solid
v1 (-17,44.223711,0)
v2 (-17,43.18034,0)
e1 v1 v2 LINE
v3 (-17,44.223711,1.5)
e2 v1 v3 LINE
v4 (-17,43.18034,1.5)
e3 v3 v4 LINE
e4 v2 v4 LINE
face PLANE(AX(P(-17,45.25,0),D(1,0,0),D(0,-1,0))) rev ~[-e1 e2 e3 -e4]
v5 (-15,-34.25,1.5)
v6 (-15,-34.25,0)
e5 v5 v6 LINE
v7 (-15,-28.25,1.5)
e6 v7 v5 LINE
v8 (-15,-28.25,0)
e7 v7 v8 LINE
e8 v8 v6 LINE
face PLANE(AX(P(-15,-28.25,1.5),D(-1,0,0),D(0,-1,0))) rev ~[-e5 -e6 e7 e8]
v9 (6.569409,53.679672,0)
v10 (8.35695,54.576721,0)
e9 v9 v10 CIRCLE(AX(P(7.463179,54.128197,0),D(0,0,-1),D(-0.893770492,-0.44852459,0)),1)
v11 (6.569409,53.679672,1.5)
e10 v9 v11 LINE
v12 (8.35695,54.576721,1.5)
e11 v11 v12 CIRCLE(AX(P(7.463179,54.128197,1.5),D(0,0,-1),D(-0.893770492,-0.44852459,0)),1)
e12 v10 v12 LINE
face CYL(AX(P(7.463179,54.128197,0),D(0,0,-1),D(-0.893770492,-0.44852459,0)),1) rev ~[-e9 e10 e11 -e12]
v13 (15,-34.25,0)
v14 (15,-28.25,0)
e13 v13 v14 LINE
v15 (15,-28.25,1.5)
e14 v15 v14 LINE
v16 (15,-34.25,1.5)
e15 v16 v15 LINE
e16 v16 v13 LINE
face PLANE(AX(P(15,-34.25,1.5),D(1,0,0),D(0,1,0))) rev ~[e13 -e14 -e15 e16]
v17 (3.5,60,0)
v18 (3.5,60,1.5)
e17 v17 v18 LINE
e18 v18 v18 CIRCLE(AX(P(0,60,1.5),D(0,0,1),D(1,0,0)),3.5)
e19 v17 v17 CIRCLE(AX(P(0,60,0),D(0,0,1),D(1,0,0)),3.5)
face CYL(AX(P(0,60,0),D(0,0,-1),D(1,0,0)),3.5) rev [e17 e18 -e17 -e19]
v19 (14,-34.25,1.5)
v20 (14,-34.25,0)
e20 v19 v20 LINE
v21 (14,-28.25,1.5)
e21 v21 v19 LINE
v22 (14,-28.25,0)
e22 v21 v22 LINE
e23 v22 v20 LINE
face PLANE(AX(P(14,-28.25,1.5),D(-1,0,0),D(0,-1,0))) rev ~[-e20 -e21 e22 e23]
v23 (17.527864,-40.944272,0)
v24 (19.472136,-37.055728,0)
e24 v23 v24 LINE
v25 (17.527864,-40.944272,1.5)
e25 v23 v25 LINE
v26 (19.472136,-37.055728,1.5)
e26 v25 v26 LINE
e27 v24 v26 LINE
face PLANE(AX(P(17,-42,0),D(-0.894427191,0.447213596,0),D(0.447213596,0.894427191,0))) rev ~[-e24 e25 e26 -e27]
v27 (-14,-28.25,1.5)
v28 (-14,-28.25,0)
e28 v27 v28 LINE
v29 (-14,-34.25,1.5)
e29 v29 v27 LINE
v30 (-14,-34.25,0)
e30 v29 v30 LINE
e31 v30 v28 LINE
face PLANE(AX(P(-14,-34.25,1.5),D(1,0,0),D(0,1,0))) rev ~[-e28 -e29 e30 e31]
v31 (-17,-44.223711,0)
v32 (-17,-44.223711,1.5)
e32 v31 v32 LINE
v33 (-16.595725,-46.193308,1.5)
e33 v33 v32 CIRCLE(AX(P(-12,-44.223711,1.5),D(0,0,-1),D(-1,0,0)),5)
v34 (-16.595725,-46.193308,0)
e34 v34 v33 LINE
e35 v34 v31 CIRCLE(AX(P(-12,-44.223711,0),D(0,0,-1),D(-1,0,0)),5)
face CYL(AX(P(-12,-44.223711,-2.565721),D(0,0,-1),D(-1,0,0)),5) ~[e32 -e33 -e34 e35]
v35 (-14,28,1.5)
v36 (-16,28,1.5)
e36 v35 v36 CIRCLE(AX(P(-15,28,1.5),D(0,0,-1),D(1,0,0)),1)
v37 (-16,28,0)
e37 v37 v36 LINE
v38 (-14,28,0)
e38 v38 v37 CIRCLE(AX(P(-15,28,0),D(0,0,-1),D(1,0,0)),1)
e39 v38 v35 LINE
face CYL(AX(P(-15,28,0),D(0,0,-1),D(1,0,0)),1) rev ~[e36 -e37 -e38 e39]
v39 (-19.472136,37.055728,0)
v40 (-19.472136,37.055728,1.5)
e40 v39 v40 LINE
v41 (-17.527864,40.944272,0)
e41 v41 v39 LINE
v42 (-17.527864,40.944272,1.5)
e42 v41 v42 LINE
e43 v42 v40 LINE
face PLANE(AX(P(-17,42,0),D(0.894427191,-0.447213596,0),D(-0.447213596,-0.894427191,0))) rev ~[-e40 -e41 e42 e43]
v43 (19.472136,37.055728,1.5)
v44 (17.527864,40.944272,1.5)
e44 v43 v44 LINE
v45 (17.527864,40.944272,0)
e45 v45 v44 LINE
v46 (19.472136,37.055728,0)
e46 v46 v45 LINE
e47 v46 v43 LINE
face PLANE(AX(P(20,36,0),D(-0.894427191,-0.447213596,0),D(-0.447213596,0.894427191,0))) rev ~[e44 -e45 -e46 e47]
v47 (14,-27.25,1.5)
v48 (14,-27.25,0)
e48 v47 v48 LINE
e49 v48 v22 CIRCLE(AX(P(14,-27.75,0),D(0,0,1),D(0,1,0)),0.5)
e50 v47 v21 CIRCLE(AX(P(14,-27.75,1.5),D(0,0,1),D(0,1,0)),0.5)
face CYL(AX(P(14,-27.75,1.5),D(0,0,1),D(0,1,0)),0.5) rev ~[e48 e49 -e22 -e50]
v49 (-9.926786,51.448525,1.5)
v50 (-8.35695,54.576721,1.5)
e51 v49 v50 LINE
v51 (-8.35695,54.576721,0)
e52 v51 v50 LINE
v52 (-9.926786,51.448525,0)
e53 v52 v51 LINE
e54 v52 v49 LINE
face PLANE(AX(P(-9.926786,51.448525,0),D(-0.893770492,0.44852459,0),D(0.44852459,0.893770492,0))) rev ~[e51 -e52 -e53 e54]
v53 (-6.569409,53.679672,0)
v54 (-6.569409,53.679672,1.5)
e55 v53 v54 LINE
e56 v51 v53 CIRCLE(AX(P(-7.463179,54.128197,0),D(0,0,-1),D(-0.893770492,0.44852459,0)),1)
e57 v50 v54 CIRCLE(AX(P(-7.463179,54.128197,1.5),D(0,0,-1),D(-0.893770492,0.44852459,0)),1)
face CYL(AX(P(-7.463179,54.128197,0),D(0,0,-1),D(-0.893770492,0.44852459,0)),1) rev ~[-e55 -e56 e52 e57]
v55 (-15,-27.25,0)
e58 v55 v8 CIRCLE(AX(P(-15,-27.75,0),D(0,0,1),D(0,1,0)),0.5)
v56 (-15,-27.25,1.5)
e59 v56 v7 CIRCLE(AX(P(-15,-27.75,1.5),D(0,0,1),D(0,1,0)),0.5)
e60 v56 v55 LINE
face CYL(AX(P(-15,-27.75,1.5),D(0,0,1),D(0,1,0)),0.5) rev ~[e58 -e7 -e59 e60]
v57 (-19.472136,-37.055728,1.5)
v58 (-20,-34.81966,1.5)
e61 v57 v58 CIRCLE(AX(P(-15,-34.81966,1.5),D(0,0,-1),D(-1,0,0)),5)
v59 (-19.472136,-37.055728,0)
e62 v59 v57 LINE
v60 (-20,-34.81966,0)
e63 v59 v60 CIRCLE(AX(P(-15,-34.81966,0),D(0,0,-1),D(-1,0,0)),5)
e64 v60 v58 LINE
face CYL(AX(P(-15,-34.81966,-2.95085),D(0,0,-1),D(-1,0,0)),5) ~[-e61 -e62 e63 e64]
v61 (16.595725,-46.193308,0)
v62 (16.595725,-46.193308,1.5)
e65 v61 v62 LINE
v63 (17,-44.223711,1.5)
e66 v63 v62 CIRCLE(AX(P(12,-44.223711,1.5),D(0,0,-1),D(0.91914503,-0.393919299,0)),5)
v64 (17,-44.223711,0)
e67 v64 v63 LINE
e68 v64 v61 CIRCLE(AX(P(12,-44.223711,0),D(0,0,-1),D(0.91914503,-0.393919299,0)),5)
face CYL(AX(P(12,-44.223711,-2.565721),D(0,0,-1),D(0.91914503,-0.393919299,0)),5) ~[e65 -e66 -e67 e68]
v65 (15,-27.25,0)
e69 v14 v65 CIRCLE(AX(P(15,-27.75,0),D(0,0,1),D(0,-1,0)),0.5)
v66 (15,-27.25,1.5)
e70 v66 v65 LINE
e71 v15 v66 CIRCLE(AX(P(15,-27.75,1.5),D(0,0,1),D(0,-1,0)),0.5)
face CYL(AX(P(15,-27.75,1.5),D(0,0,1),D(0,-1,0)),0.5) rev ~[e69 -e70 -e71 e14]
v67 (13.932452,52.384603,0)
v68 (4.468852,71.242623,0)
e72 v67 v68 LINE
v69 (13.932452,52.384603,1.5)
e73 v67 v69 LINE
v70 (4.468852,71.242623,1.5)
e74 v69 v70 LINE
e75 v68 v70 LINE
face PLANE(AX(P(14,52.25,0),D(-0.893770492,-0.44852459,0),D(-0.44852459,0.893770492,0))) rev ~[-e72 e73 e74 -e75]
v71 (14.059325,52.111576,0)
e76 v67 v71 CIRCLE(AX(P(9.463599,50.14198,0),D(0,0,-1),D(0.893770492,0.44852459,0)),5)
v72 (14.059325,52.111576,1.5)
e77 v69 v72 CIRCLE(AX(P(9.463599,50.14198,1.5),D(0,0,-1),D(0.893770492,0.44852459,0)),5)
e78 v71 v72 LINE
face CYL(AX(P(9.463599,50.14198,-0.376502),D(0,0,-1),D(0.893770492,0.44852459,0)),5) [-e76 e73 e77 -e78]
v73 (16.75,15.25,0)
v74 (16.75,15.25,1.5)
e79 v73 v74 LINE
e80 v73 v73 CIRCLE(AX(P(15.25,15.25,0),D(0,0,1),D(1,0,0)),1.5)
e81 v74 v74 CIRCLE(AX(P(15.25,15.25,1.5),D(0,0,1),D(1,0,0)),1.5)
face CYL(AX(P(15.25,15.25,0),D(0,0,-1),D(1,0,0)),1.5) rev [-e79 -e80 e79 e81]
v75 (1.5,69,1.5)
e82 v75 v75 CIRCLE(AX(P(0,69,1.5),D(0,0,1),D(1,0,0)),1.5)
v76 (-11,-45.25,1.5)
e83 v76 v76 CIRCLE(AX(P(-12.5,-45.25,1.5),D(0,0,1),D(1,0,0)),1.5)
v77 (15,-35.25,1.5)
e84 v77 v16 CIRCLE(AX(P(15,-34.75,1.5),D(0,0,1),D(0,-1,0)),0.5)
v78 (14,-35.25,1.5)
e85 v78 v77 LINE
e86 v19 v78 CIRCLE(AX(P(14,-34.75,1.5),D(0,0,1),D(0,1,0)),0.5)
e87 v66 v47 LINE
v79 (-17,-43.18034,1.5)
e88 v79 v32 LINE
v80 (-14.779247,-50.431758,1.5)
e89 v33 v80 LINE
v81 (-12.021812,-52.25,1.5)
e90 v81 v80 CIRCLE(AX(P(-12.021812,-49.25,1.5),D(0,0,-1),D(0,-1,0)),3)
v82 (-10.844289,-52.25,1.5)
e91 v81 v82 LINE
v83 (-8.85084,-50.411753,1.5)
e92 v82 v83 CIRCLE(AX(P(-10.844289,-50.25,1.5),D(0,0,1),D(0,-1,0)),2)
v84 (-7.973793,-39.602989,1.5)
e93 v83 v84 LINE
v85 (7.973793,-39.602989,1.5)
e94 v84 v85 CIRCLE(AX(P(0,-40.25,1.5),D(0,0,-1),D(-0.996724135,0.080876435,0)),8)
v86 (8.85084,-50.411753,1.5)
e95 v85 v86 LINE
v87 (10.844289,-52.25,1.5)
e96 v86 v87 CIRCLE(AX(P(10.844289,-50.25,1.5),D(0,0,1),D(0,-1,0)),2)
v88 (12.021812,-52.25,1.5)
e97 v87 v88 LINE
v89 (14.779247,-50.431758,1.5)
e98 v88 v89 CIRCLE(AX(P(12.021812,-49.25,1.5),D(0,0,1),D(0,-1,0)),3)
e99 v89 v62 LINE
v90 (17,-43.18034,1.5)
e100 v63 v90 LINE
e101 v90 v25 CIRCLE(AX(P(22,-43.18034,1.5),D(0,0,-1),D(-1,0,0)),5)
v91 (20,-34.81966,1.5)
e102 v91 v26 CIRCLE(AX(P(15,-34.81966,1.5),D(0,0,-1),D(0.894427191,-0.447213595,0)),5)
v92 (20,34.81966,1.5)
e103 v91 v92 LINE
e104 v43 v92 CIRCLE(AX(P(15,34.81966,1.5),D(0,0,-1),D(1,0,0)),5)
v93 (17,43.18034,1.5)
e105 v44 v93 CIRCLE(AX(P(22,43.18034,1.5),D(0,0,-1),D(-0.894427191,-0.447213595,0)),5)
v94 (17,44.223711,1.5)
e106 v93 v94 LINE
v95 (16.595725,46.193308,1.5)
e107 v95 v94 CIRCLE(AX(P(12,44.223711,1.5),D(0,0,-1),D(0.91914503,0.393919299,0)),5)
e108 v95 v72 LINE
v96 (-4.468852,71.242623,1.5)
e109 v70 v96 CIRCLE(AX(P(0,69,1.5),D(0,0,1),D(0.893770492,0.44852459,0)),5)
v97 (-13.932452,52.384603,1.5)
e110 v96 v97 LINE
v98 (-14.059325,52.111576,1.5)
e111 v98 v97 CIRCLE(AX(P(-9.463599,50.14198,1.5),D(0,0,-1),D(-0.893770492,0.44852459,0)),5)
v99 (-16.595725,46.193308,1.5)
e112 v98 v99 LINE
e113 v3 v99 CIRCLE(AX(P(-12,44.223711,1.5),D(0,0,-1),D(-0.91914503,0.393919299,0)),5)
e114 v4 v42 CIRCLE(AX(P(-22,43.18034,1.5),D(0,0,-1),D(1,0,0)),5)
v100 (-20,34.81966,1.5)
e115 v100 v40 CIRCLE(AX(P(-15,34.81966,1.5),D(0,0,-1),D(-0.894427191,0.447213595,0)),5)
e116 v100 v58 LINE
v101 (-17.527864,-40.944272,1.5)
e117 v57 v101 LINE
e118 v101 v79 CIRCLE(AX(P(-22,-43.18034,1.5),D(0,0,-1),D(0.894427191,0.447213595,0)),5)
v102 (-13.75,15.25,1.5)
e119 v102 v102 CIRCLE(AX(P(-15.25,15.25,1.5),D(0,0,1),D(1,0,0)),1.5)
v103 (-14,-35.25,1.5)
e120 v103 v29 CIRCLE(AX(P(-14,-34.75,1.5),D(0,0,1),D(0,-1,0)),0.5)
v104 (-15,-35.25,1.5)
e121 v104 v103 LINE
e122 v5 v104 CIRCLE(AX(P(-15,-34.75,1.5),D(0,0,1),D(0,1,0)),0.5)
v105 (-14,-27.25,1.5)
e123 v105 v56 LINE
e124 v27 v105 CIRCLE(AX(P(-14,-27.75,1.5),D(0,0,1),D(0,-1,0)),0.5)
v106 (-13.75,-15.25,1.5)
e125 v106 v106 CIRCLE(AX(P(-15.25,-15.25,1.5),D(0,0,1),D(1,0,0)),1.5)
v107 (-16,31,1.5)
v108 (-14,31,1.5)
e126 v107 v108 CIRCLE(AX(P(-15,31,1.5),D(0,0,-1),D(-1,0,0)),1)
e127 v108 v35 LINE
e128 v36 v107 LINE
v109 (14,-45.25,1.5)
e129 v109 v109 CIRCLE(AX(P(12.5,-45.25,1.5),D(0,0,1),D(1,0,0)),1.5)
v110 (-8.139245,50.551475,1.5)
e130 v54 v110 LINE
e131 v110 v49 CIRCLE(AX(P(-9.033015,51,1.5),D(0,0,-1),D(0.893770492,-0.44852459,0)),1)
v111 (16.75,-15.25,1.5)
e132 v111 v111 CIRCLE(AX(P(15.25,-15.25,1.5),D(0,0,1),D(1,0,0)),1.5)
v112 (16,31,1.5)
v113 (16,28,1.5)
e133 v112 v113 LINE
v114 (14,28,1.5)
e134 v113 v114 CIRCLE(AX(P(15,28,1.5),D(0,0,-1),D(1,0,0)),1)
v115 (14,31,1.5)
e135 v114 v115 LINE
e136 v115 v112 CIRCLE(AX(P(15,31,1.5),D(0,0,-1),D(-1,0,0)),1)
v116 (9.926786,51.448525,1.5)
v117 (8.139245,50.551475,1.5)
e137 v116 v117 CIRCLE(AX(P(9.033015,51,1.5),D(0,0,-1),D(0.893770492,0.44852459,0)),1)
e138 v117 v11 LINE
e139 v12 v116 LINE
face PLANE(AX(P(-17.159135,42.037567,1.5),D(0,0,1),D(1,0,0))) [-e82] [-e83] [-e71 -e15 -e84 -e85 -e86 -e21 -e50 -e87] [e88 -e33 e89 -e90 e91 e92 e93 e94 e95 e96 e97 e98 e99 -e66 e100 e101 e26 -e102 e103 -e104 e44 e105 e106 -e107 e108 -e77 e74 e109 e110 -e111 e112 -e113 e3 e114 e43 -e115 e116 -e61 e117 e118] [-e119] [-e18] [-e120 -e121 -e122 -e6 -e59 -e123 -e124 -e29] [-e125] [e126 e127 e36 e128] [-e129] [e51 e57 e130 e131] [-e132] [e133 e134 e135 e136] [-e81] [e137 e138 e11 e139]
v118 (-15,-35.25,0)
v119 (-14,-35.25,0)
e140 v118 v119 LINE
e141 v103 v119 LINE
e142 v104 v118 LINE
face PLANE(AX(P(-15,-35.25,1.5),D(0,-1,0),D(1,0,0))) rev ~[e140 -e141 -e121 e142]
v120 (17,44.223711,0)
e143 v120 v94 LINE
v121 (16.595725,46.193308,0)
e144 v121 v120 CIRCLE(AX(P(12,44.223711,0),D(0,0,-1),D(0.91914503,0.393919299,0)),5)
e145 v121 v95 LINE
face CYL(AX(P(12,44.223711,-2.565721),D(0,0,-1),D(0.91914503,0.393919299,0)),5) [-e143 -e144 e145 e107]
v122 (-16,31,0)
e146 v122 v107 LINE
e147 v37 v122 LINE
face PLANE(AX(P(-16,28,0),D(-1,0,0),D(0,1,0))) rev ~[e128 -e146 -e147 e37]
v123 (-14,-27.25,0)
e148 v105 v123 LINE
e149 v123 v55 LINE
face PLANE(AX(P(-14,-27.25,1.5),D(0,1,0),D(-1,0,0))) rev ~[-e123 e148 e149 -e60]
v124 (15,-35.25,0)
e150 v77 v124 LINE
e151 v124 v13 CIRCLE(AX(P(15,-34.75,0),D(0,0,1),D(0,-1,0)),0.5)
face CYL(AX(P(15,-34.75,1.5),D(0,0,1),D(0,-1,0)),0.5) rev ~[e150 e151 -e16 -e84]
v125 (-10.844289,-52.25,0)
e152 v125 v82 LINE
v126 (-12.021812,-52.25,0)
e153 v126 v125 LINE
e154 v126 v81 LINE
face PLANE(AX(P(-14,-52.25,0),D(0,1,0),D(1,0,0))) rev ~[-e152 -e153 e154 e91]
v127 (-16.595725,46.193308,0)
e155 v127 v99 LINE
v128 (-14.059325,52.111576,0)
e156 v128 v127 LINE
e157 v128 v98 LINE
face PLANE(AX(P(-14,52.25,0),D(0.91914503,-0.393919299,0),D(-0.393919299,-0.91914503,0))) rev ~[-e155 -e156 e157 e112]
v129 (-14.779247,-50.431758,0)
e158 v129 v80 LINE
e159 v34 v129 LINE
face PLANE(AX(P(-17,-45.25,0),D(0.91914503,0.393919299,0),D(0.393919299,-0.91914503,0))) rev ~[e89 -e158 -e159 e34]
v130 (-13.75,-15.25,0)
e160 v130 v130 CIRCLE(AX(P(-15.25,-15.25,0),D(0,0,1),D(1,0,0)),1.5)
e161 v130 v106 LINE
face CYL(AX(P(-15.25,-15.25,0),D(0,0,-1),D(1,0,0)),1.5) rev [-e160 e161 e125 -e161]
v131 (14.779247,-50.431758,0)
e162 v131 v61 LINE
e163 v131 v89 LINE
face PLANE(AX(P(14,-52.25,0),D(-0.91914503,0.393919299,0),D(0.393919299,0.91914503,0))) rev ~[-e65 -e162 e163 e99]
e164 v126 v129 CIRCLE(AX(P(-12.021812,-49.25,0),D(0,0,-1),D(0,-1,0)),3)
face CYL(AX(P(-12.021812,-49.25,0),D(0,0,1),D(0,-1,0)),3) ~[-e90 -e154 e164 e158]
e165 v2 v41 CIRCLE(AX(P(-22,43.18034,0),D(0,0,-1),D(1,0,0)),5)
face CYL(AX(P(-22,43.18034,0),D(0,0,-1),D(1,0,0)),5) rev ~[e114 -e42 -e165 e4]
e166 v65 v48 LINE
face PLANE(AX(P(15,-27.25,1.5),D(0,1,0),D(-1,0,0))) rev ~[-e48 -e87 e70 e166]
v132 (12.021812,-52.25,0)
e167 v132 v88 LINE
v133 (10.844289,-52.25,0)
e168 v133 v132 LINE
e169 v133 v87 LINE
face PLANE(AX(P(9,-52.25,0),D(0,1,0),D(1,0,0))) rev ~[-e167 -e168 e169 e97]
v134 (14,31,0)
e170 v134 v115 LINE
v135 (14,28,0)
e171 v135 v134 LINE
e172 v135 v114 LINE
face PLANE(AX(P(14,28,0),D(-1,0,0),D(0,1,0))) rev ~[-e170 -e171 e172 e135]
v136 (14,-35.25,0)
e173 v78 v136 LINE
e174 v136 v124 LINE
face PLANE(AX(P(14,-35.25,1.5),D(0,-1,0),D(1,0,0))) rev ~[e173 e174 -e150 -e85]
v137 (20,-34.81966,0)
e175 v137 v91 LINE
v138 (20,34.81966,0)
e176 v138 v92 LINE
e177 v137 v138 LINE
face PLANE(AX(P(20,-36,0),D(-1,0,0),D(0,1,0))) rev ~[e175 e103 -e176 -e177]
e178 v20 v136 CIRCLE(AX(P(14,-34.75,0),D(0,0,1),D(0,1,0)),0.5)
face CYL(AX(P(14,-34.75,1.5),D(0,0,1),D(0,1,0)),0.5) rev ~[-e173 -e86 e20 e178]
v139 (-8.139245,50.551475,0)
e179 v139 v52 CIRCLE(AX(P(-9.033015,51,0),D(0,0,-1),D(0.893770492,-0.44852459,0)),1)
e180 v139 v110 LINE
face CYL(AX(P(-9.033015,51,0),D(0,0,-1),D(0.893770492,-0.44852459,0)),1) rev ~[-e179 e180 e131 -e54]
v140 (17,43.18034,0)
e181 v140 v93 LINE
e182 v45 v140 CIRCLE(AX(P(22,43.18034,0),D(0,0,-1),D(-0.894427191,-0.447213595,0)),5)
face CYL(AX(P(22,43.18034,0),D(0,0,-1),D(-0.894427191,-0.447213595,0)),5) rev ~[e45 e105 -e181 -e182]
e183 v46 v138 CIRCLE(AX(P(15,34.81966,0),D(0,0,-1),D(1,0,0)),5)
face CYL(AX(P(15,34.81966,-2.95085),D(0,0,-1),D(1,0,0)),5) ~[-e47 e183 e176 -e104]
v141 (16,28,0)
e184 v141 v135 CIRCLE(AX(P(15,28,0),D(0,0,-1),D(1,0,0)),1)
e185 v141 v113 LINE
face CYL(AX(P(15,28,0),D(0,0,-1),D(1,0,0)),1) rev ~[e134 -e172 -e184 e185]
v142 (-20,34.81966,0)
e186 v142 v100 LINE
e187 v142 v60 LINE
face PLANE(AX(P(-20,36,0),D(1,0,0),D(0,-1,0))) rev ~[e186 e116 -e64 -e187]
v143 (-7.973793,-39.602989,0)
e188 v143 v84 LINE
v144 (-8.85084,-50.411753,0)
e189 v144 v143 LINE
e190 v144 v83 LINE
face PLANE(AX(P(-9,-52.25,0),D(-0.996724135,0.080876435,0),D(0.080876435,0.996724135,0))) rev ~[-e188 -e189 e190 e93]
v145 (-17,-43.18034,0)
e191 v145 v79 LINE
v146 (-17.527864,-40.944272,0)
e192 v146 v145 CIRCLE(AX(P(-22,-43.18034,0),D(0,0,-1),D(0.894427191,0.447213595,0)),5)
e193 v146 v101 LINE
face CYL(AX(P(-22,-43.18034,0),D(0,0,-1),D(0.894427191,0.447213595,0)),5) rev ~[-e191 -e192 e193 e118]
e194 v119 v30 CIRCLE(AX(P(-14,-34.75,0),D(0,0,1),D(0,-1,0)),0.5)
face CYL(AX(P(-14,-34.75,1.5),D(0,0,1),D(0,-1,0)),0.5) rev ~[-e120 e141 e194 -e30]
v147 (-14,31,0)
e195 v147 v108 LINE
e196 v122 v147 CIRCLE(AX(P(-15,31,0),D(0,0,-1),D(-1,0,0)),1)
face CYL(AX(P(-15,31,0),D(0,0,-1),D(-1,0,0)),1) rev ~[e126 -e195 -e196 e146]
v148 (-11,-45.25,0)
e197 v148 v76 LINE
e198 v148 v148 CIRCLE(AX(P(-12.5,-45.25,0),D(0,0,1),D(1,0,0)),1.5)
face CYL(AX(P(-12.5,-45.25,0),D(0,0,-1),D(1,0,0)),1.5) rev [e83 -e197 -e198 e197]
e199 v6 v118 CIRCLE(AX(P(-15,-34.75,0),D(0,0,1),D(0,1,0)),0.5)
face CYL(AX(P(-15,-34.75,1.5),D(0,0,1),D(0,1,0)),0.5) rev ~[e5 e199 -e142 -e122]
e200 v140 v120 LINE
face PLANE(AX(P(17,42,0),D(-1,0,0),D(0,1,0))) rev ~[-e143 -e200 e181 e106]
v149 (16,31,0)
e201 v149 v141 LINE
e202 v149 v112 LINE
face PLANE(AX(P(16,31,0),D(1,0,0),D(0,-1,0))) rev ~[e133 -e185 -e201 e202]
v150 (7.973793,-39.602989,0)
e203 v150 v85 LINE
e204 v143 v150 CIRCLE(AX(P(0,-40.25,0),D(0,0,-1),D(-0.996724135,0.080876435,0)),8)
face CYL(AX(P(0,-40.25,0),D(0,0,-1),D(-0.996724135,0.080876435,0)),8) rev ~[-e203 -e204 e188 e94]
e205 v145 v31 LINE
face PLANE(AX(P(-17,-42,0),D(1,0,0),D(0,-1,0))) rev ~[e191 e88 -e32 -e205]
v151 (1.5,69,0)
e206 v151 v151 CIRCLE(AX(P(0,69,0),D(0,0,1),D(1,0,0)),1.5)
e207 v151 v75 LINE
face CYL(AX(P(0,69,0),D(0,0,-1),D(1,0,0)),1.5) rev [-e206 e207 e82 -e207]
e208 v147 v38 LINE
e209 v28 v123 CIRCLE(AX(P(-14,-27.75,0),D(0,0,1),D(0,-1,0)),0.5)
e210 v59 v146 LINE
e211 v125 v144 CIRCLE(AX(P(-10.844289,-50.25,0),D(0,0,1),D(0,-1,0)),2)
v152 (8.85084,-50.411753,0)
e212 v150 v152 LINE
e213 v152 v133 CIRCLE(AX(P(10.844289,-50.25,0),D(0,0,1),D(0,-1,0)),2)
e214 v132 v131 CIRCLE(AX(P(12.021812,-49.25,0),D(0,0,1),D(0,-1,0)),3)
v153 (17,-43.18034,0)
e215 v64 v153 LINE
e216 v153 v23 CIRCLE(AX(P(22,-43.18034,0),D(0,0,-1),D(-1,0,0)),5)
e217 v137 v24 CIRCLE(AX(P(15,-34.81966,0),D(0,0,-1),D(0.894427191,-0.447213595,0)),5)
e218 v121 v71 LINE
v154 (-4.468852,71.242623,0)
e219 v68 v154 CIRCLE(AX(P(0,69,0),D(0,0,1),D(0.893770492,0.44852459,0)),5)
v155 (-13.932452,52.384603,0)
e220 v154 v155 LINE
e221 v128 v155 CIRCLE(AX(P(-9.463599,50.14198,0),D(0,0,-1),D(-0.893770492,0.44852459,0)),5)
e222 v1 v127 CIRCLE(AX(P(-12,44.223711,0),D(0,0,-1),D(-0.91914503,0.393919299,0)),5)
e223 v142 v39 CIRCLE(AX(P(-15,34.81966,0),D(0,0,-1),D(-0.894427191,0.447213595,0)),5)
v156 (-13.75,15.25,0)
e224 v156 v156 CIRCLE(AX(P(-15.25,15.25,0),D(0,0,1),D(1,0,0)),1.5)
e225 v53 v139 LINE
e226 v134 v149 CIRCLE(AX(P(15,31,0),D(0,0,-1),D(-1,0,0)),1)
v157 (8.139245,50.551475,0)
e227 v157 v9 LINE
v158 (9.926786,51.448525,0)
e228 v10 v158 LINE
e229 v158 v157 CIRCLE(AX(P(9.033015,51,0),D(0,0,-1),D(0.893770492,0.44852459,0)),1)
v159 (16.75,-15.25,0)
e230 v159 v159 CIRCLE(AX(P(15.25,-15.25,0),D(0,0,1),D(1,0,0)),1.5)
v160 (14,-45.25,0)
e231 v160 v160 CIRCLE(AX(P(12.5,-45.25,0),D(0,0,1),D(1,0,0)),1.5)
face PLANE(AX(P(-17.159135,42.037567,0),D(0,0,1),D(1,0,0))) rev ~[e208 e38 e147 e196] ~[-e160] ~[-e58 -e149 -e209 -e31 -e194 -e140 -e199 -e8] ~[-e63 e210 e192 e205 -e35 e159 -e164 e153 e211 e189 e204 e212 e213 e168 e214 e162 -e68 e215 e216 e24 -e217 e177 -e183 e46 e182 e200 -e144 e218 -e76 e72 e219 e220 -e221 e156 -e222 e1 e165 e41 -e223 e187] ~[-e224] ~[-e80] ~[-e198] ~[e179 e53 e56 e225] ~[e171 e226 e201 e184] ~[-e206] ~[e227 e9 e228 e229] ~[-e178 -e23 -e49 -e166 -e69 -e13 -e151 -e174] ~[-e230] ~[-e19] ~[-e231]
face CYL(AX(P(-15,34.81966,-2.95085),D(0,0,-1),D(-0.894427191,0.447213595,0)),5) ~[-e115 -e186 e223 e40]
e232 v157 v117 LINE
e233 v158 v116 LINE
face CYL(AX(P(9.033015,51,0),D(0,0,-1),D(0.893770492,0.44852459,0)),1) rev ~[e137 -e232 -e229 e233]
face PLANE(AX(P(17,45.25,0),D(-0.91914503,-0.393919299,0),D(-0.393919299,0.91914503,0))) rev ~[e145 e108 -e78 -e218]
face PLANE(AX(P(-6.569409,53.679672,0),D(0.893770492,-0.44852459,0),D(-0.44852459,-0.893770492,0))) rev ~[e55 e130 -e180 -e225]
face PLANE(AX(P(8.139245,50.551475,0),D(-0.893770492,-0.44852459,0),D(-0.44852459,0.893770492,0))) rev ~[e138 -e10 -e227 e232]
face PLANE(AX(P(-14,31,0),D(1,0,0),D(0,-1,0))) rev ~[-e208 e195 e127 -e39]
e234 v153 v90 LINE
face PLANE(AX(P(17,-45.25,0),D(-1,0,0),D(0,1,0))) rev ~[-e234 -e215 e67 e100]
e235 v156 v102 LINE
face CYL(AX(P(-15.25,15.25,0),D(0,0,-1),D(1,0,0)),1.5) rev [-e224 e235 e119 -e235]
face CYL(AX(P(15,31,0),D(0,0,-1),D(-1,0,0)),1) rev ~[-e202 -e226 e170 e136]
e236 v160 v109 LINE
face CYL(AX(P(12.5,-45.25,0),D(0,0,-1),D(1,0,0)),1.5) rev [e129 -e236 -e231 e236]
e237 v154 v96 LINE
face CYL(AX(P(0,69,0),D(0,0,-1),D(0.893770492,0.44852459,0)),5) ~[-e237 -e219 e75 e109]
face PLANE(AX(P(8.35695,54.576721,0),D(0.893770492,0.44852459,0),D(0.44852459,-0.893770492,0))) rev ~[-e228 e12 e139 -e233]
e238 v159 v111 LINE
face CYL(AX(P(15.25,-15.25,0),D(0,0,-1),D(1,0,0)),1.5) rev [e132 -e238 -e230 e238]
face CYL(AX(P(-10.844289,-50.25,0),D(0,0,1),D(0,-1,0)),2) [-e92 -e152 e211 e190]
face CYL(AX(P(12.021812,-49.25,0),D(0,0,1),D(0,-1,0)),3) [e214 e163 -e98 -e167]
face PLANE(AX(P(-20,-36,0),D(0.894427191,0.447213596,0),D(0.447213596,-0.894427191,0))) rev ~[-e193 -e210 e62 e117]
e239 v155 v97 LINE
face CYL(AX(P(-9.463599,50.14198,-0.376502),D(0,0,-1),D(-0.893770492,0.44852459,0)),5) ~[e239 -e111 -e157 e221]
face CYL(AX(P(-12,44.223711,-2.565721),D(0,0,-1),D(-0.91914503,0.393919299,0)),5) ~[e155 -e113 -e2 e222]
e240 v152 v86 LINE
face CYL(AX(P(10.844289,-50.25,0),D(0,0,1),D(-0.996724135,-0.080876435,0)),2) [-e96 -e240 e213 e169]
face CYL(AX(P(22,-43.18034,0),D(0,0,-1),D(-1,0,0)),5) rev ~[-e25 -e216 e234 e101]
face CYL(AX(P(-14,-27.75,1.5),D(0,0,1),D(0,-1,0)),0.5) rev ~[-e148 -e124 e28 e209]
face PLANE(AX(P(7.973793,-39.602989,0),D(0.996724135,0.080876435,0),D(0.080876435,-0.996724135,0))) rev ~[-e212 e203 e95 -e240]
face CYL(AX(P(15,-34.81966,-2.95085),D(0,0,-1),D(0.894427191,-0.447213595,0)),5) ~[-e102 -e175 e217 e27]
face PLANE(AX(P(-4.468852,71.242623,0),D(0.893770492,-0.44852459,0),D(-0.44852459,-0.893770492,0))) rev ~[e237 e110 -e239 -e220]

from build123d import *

# Parameters (mm, degrees)
F0_R        = 1.5
F0_R_2      = 3.5
F1_DEPTH    = 1.5
F2_T1_DEPTH = 1.5
F2_T3_DEPTH = 6.6314425489
F2_T5_DEPTH = 7.4016994375
F2_T7_DEPTH = 2.253003807
F4_DEPTH    = 25
F5_R        = 2
F6_R        = 3


# Not quite as in the source:
# - a fillet or chamfer that OpenCascade refuses, or shapes differently, is made with other operations: its cross-section is extruded or revolved along the edge and cut away or added


with BuildPart() as f1:
    # F0 (on Top) → F1 (new body)
    with BuildSketch(Plane.XY):
        with BuildLine():
            Line((-17, 42), (-20, 36))
            Line((-20, 36), (-20, -36))
            Line((-20, -36), (-17, -42))
            Line((-17, -42), (-17, -45.25))
            Line((-17, -45.25), (-14, -52.25))
            Line((-14, -52.25), (-9, -52.25))
            Line((-9, -52.25), (-7.9737930839, -39.6029885204))
            ThreePointArc((-7.9737930839, -39.6029885204), (0, -32.25), (7.9737930839, -39.6029885204))
            Line((7.9737930839, -39.6029885204), (9, -52.25))
            Line((9, -52.25), (14, -52.25))
            Line((14, -52.25), (17, -45.25))
            Line((17, -45.25), (17, -42))
            Line((17, -42), (20, -36))
            Line((20, -36), (20, 36))
            Line((20, 36), (17, 42))
            Line((17, 42), (17, 45.25))
            Line((17, 45.25), (14, 52.25))
            Line((14, 52.25), (4.468852459, 71.2426229508))
            ThreePointArc((4.468852459, 71.2426229508), (0, 74), (-4.468852459, 71.2426229508))
            Line((-4.468852459, 71.2426229508), (-14, 52.25))
            Line((-14, 52.25), (-17, 45.25))
            Line((-17, 45.25), (-17, 42))
        make_face()
        with Locations((-12.5, -45.25)):
            Circle(F0_R, mode=Mode.SUBTRACT)
        with Locations((-15.25, -15.25)):
            Circle(F0_R, mode=Mode.SUBTRACT)
        with Locations((12.5, -45.25)):
            Circle(F0_R, mode=Mode.SUBTRACT)
        with Locations((15.25, -15.25)):
            Circle(F0_R, mode=Mode.SUBTRACT)
        with Locations((-15.25, 15.25)):
            Circle(F0_R, mode=Mode.SUBTRACT)
        with BuildLine():
            Line((-16, 28), (-16, 31))
            ThreePointArc((-16, 31), (-15, 32), (-14, 31))
            Line((-14, 31), (-14, 28))
            ThreePointArc((-14, 28), (-15, 27), (-16, 28))
        make_face(mode=Mode.SUBTRACT)
        with BuildLine():
            Line((-6.5694088498, 53.6796721311), (-8.1392449154, 50.5514754098))
            ThreePointArc((-8.1392449154, 50.5514754098), (-9.4815399974, 50.1062295082), (-9.926785899, 51.4485245902))
            Line((-9.926785899, 51.4485245902), (-8.3569498334, 54.5767213115))
            ThreePointArc((-8.3569498334, 54.5767213115), (-7.0146547515, 55.0219672131), (-6.5694088498, 53.6796721311))
        make_face(mode=Mode.SUBTRACT)
        with Locations((15.25, 15.25)):
            Circle(F0_R, mode=Mode.SUBTRACT)
        with BuildLine():
            ThreePointArc((16, 28), (15, 27), (14, 28))
            Line((14, 28), (14, 31))
            ThreePointArc((14, 31), (15, 32), (16, 31))
            Line((16, 31), (16, 28))
        make_face(mode=Mode.SUBTRACT)
        with BuildLine():
            ThreePointArc((9.926785899, 51.4485245902), (9.4815399974, 50.1062295082), (8.1392449154, 50.5514754098))
            Line((8.1392449154, 50.5514754098), (6.5694088498, 53.6796721311))
            ThreePointArc((6.5694088498, 53.6796721311), (7.0146547515, 55.0219672131), (8.3569498334, 54.5767213115))
            Line((8.3569498334, 54.5767213115), (9.926785899, 51.4485245902))
        make_face(mode=Mode.SUBTRACT)
        with Locations((0, 60)):
            Circle(F0_R_2, mode=Mode.SUBTRACT)
        with Locations((0, 69)):
            Circle(F0_R, mode=Mode.SUBTRACT)
    extrude(amount=F1_DEPTH)

    # F2: fillet of radius 5 on 14 edges, made by hand

    # F2_s2 → F2_t1 (join)
    with BuildSketch(Plane.XY):
        with BuildLine():
            ThreePointArc((-17, 43.1803398875), (-17.1337550527, 42.0315752848), (-17.527864045, 40.94427191))
            Line((-17.527864045, 40.94427191), (-17, 42))
            Line((-17, 42), (-17, 43.1803398875))
        make_face()
        with BuildLine():
            ThreePointArc((17.527864045, 40.94427191), (17.1337550527, 42.0315752848), (17, 43.1803398875))
            Line((17, 43.1803398875), (17, 42))
            Line((17, 42), (17.527864045, 40.94427191))
        make_face()
        with BuildLine():
            ThreePointArc((17, -43.1803398875), (17.1337550527, -42.0315752848), (17.527864045, -40.94427191))
            Line((17.527864045, -40.94427191), (17, -42))
            Line((17, -42), (17, -43.1803398875))
        make_face()
        with BuildLine():
            ThreePointArc((-17.527864045, -40.94427191), (-17.1337550527, -42.0315752848), (-17, -43.1803398875))
            Line((-17, -43.1803398875), (-17, -42))
            Line((-17, -42), (-17.527864045, -40.94427191))
        make_face()
    extrude(amount=F2_T1_DEPTH)

    # F2_s4 → F2_t3 (cut)
    with BuildSketch(Plane.XY.offset(-2.5657212744)):
        with BuildLine():
            ThreePointArc((16.5957251501, -46.1933079831), (16.897888614, -45.2290408516), (17, -44.2237114902))
            Line((17, -44.2237114902), (17, -45.25))
            Line((17, -45.25), (16.5957251501, -46.1933079831))
        make_face()
        with BuildLine():
            ThreePointArc((-16.5957251501, 46.1933079831), (-16.897888614, 45.2290408516), (-17, 44.2237114902))
            Line((-17, 44.2237114902), (-17, 45.25))
            Line((-17, 45.25), (-16.5957251501, 46.1933079831))
        make_face()
        with BuildLine():
            ThreePointArc((16.5957251501, 46.1933079831), (16.897888614, 45.2290408516), (17, 44.2237114902))
            Line((17, 44.2237114902), (17, 45.25))
            Line((17, 45.25), (16.5957251501, 46.1933079831))
        make_face()
        with BuildLine():
            ThreePointArc((-17, -44.2237114902), (-16.897888614, -45.2290408516), (-16.5957251501, -46.1933079831))
            Line((-16.5957251501, -46.1933079831), (-17, -45.25))
            Line((-17, -45.25), (-17, -44.2237114902))
        make_face()
    extrude(amount=F2_T3_DEPTH, mode=Mode.SUBTRACT)

    # F2_s6 → F2_t5 (cut)
    with BuildSketch(Plane.XY.offset(-2.9508497187)):
        with BuildLine():
            ThreePointArc((-19.472135955, 37.05572809), (-19.8662449473, 35.9684247152), (-20, 34.8196601125))
            Line((-20, 34.8196601125), (-20, 36))
            Line((-20, 36), (-19.472135955, 37.05572809))
        make_face()
        with BuildLine():
            ThreePointArc((20, 34.8196601125), (19.8662449473, 35.9684247152), (19.472135955, 37.05572809))
            Line((19.472135955, 37.05572809), (20, 36))
            Line((20, 36), (20, 34.8196601125))
        make_face()
        with BuildLine():
            ThreePointArc((19.472135955, -37.05572809), (19.8662449473, -35.9684247152), (20, -34.8196601125))
            Line((20, -34.8196601125), (20, -36))
            Line((20, -36), (19.472135955, -37.05572809))
        make_face()
        with BuildLine():
            ThreePointArc((-20, -34.8196601125), (-19.8662449473, -35.9684247152), (-19.472135955, -37.05572809))
            Line((-19.472135955, -37.05572809), (-20, -36))
            Line((-20, -36), (-20, -34.8196601125))
        make_face()
    extrude(amount=F2_T5_DEPTH, mode=Mode.SUBTRACT)

    # F2_s8 → F2_t7 (cut)
    with BuildSketch(Plane.XY.offset(-0.3765019035)):
        with BuildLine():
            ThreePointArc((-13.9324518552, 52.3846025166), (-13.9979436343, 52.2490444272), (-14.0593245463, 52.1115760587))
            Line((-14.0593245463, 52.1115760587), (-14, 52.25))
            Line((-14, 52.25), (-13.9324518552, 52.3846025166))
        make_face()
        with BuildLine():
            ThreePointArc((13.9324518552, 52.3846025166), (13.9979436343, 52.2490444272), (14.0593245463, 52.1115760587))
            Line((14.0593245463, 52.1115760587), (14, 52.25))
            Line((14, 52.25), (13.9324518552, 52.3846025166))
        make_face()
    extrude(amount=F2_T7_DEPTH, mode=Mode.SUBTRACT)

    # F3 (on face) → F4 (cut)
    with BuildSketch(Plane.XY.offset(1.5)):
        with BuildLine():
            Line((-14, -27.25), (-15, -27.25))
            ThreePointArc((-15, -27.25), (-15.5, -27.75), (-15, -28.25))
            Line((-15, -28.25), (-15, -34.25))
            ThreePointArc((-15, -34.25), (-15.5, -34.75), (-15, -35.25))
            Line((-15, -35.25), (-14, -35.25))
            ThreePointArc((-14, -35.25), (-13.5, -34.75), (-14, -34.25))
            Line((-14, -34.25), (-14, -28.25))
            ThreePointArc((-14, -28.25), (-13.5, -27.75), (-14, -27.25))
        make_face()
        with BuildLine():
            Line((14, -35.25), (15, -35.25))
            ThreePointArc((15, -35.25), (15.5, -34.75), (15, -34.25))
            Line((15, -34.25), (15, -28.25))
            ThreePointArc((15, -28.25), (15.5, -27.75), (15, -27.25))
            Line((15, -27.25), (14, -27.25))
            ThreePointArc((14, -27.25), (13.5, -27.75), (14, -28.25))
            Line((14, -28.25), (14, -34.25))
            ThreePointArc((14, -34.25), (13.5, -34.75), (14, -35.25))
        make_face()
    extrude(amount=-F4_DEPTH, mode=Mode.SUBTRACT)

    # F5
    f5_edges = [f1.edges().sort_by_distance(p)[0] for p in [
        (-9, -52.25, 0.75),
        (9, -52.25, 0.75),
    ]]
    fillet(f5_edges, radius=F5_R)

    # F6
    f6_edges = [f1.edges().sort_by_distance(p)[0] for p in [
        (-14, -52.25, 0.75),
        (14, -52.25, 0.75),
    ]]
    fillet(f6_edges, radius=F6_R)


solid = f1.part
